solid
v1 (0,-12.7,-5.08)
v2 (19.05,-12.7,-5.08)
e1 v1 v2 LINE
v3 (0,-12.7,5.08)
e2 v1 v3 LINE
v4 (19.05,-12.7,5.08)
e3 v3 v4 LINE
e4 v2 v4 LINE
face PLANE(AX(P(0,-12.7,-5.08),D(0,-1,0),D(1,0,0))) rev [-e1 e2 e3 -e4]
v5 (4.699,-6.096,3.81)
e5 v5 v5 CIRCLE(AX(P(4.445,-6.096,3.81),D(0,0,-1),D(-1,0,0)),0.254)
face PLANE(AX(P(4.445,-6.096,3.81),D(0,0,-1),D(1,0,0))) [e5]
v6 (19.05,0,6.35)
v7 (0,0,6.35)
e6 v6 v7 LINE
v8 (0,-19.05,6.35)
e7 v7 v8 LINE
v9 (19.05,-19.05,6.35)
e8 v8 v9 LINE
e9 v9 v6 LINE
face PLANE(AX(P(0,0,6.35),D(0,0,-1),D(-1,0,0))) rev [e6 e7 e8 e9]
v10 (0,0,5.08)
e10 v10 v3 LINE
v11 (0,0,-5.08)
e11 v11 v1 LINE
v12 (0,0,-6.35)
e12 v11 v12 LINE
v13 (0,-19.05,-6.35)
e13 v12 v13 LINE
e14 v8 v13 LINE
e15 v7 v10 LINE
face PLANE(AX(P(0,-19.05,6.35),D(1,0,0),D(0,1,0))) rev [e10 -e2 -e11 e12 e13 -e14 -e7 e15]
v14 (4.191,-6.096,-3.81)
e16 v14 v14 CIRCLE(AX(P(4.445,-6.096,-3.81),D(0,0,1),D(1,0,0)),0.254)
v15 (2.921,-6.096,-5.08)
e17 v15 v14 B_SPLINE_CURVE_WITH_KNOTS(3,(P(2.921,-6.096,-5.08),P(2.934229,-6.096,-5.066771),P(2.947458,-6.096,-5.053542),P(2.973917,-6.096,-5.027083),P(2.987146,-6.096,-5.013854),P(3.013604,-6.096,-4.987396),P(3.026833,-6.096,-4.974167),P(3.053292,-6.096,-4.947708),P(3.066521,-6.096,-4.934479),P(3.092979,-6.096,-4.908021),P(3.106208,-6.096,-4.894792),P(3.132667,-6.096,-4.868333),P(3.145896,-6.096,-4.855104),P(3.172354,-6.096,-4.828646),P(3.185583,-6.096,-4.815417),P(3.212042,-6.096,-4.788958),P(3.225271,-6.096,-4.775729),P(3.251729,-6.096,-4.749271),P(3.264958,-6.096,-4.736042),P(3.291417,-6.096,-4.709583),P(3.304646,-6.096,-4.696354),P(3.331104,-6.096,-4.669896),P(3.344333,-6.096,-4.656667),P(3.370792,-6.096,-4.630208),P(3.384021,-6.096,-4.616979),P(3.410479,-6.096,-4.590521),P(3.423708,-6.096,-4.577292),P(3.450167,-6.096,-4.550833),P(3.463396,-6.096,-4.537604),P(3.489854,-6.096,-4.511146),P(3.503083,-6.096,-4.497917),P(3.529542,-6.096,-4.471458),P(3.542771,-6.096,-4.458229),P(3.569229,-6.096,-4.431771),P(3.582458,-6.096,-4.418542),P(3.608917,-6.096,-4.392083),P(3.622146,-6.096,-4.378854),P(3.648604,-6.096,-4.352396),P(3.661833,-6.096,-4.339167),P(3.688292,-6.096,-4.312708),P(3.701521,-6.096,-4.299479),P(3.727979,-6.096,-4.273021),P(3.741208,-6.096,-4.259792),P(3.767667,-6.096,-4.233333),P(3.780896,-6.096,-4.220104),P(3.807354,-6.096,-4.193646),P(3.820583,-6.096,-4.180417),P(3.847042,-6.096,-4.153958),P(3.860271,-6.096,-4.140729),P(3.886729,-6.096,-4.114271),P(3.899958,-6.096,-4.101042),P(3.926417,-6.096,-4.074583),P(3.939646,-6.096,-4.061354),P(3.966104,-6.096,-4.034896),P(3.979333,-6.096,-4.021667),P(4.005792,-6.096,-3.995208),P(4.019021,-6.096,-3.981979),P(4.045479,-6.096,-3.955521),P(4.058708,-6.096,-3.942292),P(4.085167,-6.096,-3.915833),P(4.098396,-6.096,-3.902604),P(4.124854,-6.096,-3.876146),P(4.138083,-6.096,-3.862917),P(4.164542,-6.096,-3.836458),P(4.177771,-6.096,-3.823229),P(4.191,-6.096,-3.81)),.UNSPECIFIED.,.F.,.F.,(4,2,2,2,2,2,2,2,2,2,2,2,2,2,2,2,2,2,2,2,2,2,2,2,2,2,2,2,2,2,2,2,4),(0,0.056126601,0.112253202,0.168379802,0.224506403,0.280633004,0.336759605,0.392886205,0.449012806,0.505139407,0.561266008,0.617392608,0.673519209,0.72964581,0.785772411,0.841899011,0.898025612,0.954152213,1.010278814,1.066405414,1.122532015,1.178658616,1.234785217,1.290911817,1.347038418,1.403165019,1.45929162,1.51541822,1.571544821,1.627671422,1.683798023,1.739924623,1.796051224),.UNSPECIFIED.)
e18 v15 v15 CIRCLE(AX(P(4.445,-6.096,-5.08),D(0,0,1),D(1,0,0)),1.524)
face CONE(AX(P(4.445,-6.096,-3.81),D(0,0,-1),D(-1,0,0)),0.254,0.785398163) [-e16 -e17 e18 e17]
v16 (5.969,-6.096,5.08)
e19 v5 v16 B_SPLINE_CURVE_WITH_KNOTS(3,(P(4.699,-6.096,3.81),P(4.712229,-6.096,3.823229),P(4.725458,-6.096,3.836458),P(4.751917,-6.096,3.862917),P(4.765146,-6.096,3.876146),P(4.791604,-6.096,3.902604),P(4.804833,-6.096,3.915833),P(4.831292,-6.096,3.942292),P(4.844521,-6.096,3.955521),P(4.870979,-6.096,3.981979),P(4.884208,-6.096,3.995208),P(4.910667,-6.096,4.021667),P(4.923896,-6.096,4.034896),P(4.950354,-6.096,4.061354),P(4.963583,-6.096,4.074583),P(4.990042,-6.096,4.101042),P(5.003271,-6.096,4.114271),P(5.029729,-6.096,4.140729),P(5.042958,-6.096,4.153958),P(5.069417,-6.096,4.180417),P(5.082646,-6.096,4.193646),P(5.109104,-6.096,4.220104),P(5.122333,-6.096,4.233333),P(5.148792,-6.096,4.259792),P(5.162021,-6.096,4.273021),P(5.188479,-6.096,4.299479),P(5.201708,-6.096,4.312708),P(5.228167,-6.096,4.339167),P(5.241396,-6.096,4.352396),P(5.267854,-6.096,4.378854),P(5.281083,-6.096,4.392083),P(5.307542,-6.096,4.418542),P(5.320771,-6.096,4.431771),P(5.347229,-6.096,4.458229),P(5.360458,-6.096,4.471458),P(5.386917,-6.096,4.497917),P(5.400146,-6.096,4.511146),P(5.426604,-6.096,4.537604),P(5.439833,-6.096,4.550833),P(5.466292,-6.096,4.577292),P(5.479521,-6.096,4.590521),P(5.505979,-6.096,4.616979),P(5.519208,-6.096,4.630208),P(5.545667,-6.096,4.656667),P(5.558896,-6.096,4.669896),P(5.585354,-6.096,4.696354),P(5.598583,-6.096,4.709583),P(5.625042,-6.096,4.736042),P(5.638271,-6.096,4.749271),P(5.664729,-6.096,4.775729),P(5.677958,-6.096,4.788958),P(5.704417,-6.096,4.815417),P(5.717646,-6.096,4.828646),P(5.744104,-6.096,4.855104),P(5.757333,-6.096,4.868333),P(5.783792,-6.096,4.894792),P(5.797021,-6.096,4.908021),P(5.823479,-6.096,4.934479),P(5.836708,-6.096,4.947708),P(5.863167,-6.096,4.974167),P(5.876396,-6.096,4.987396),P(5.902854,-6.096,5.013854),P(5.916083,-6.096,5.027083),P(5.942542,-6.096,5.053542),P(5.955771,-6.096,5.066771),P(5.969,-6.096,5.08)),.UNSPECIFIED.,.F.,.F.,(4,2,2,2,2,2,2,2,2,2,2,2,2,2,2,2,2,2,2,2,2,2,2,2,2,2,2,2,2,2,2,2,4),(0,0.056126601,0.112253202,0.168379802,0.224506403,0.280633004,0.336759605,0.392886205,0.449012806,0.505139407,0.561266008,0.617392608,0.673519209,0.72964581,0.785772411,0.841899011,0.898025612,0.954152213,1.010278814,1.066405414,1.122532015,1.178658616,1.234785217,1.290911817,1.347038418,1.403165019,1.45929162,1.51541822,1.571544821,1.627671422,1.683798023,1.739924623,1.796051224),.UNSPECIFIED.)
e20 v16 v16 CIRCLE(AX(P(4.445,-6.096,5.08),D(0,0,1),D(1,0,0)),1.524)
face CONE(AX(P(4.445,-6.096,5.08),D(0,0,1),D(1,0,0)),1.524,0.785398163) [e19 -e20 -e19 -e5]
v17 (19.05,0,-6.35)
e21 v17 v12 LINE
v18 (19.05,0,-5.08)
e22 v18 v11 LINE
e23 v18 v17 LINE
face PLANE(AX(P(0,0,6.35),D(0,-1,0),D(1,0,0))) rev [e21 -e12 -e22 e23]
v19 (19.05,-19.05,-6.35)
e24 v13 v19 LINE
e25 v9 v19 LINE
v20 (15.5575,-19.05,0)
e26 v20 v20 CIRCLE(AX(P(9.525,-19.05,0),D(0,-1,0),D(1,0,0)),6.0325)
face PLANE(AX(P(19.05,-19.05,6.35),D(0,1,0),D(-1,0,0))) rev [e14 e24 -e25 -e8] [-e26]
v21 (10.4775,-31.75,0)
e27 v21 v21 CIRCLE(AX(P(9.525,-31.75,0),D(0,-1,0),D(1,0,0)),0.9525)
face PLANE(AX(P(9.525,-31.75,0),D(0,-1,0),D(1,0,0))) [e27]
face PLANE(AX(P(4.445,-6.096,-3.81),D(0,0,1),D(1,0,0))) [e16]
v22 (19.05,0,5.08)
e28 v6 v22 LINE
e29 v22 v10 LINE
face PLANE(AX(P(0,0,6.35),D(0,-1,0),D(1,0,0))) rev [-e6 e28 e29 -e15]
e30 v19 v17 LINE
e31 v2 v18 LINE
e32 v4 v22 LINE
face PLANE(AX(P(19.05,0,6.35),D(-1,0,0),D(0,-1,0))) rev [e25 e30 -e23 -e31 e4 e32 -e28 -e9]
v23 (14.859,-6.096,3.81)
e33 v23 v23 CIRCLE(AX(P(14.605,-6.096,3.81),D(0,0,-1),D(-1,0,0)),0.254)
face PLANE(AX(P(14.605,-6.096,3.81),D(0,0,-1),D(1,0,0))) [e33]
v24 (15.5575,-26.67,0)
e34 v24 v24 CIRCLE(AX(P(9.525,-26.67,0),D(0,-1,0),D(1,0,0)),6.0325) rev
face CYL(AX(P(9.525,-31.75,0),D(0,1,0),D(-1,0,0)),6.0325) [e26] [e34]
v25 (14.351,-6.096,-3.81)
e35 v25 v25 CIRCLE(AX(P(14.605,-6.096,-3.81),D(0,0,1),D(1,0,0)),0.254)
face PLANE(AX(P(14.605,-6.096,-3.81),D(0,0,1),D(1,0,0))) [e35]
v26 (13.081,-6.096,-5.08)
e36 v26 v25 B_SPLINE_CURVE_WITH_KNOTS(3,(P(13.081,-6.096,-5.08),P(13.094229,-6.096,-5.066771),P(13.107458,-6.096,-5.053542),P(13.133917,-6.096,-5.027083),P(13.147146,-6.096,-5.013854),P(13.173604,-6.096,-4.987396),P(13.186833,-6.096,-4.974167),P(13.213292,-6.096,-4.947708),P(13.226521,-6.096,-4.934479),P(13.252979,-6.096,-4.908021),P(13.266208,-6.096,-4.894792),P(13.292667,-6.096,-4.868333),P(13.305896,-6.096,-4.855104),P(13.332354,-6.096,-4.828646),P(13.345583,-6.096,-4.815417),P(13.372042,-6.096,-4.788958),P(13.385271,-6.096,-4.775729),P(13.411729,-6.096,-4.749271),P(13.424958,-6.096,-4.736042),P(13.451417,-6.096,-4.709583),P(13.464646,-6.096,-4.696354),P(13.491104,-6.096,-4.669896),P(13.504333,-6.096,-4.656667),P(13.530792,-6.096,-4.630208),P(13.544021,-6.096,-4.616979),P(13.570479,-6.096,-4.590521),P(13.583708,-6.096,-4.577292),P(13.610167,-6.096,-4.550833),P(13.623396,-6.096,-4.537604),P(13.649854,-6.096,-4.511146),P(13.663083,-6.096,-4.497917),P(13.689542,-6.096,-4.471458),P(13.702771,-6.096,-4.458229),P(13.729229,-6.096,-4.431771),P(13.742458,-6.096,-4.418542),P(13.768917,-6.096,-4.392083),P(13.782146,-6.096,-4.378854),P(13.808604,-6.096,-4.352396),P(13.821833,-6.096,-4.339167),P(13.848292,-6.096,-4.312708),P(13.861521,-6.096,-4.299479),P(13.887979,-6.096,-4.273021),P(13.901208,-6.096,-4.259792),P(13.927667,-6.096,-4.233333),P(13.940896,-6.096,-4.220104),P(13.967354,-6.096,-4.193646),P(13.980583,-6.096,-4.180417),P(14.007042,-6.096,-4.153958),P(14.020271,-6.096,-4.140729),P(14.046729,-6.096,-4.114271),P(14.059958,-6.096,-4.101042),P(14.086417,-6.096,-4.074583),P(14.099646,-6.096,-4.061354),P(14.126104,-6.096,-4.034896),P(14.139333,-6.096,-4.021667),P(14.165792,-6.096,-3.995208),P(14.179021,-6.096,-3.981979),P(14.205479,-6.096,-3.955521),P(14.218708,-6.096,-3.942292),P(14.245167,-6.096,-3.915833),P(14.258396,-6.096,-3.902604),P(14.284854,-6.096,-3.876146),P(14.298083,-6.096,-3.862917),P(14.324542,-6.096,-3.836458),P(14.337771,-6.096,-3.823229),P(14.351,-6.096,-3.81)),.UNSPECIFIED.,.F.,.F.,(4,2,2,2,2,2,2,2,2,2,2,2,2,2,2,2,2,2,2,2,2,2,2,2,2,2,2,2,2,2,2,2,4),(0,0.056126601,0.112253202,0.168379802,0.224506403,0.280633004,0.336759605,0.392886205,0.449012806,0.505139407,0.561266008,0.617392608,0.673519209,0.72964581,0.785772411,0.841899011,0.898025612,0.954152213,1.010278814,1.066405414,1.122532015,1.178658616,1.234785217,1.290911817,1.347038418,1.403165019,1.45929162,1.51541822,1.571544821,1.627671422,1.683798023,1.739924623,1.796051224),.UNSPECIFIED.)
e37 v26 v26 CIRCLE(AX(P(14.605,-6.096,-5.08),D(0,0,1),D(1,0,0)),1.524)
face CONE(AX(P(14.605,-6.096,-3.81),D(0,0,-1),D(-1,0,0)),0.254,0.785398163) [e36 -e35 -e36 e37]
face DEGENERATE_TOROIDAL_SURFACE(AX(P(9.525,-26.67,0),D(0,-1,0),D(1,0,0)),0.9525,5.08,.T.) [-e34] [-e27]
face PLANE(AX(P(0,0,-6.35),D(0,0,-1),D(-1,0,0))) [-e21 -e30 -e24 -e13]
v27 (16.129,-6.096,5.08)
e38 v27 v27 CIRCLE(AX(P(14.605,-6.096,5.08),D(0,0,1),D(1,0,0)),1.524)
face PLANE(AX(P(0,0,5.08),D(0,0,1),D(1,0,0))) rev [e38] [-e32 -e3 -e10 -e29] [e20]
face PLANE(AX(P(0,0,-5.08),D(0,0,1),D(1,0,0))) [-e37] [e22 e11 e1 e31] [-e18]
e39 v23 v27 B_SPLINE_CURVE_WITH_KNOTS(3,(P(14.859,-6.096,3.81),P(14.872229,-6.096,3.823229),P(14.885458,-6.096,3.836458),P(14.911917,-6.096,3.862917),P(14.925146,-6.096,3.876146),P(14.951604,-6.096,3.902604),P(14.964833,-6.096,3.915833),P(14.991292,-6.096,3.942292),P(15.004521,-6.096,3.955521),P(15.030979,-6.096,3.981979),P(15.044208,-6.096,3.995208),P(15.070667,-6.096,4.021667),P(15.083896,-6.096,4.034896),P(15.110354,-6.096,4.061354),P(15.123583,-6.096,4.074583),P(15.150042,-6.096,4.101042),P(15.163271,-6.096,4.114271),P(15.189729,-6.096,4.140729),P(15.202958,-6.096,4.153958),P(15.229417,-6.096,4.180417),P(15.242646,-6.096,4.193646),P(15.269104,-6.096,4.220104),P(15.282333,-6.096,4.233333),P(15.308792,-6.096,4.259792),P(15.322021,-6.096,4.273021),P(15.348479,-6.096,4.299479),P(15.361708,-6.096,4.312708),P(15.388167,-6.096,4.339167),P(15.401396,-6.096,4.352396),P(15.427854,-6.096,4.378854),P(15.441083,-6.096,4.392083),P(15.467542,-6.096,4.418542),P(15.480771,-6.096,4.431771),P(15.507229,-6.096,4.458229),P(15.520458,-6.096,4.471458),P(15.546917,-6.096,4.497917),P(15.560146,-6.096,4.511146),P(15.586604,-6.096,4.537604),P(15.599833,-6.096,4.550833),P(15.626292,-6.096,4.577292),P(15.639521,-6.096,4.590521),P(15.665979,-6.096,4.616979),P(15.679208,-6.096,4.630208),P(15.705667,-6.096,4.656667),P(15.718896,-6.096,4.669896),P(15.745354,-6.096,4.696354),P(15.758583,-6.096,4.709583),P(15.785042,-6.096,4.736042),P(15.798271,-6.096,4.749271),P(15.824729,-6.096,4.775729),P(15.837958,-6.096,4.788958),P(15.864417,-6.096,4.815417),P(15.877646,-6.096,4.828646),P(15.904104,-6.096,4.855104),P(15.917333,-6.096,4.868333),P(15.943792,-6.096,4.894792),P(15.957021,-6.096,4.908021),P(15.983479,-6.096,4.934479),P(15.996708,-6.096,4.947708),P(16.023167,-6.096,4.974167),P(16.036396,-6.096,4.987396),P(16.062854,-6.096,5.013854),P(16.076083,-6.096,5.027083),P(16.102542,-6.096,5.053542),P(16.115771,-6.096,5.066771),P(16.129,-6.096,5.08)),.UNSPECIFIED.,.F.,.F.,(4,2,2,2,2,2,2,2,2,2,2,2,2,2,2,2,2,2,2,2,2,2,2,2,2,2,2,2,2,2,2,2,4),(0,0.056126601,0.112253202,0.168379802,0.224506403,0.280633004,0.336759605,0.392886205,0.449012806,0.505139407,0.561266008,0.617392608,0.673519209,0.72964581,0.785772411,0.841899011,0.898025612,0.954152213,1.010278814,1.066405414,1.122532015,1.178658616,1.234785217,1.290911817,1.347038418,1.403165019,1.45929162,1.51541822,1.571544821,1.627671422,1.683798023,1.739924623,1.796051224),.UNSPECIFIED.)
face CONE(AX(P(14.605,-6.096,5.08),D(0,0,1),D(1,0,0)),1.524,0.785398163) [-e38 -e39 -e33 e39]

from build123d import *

# Parameters (mm, degrees)
SKETCH1_W                = 19.05
SKETCH1_H                = 19.05
BOSS_EXTRUDE1_DEPTH      = 6.35
SKETCH2_W                = 19.05
SKETCH2_H                = 12.7
CUT_EXTRUDE1_DEPTH       = 5.08
SKETCH3_R                = 1.524
BOSS_EXTRUDE2_DEPTH      = 1.27
CHAMFER1_SIZE            = 1.27
CHAMFER1_OF_MIRROR1_SIZE = 1.27
SKETCH4_R                = 6.0325
BOSS_EXTRUDE3_DEPTH      = 12.7
FILLET1_R                = 5.08


with BuildPart() as part:
    # Sketch1 → Boss-Extrude1 (new, symmetric)
    with BuildSketch(Plane.XY):
        with Locations((9.525, -9.525)):
            Rectangle(SKETCH1_W, SKETCH1_H)
    extrude(amount=BOSS_EXTRUDE1_DEPTH, both=True)

    # Sketch2 → Cut-Extrude1 (cut, symmetric)
    with BuildSketch(Plane.XY):
        with Locations((9.525, -6.35)):
            Rectangle(SKETCH2_W, SKETCH2_H)
    extrude(amount=CUT_EXTRUDE1_DEPTH, both=True, mode=Mode.SUBTRACT)

    # Sketch3 → Boss-Extrude2 (add)
    with BuildSketch(Plane.XY.offset(-5.08)):
        with Locations((14.605, -6.096)):
            Circle(SKETCH3_R)
        with Locations((4.445, -6.096)):
            Circle(SKETCH3_R)
    boss_extrude2 = extrude(amount=BOSS_EXTRUDE2_DEPTH)

    # Chamfer1
    chamfer1_edges = [part.edges().sort_by_distance(p)[0] for p in [
        (13.081, -6.096, -3.81),
        (2.921, -6.096, -3.81),
    ]]
    chamfer(chamfer1_edges, length=CHAMFER1_SIZE - 0.0001)  # a hair under: the kernel refuses the full size

    # Mirror1: Boss-Extrude2 across plane
    add(boss_extrude2.mirror(Plane.XY))

    # Chamfer1 of Mirror1
    chamfer1_of_mirror1_edges = [part.edges().sort_by_distance(p)[0] for p in [
        (13.081, -6.096, 3.81),
        (2.921, -6.096, 3.81),
    ]]
    chamfer(chamfer1_of_mirror1_edges, length=CHAMFER1_OF_MIRROR1_SIZE - 0.0001)  # a hair under: the kernel refuses the full size

    # Sketch4 → Boss-Extrude3 (add)
    with BuildSketch(Plane.XZ.offset(19.05)):
        with Locations((9.525, 0)):
            Circle(SKETCH4_R)
    extrude(amount=BOSS_EXTRUDE3_DEPTH)

    # Fillet1
    fillet1_edges = [part.edges().sort_by_distance(p)[0] for p in [
        (3.4925, -31.75, 0),
    ]]
    fillet(fillet1_edges, radius=FILLET1_R)


solid = part.part
